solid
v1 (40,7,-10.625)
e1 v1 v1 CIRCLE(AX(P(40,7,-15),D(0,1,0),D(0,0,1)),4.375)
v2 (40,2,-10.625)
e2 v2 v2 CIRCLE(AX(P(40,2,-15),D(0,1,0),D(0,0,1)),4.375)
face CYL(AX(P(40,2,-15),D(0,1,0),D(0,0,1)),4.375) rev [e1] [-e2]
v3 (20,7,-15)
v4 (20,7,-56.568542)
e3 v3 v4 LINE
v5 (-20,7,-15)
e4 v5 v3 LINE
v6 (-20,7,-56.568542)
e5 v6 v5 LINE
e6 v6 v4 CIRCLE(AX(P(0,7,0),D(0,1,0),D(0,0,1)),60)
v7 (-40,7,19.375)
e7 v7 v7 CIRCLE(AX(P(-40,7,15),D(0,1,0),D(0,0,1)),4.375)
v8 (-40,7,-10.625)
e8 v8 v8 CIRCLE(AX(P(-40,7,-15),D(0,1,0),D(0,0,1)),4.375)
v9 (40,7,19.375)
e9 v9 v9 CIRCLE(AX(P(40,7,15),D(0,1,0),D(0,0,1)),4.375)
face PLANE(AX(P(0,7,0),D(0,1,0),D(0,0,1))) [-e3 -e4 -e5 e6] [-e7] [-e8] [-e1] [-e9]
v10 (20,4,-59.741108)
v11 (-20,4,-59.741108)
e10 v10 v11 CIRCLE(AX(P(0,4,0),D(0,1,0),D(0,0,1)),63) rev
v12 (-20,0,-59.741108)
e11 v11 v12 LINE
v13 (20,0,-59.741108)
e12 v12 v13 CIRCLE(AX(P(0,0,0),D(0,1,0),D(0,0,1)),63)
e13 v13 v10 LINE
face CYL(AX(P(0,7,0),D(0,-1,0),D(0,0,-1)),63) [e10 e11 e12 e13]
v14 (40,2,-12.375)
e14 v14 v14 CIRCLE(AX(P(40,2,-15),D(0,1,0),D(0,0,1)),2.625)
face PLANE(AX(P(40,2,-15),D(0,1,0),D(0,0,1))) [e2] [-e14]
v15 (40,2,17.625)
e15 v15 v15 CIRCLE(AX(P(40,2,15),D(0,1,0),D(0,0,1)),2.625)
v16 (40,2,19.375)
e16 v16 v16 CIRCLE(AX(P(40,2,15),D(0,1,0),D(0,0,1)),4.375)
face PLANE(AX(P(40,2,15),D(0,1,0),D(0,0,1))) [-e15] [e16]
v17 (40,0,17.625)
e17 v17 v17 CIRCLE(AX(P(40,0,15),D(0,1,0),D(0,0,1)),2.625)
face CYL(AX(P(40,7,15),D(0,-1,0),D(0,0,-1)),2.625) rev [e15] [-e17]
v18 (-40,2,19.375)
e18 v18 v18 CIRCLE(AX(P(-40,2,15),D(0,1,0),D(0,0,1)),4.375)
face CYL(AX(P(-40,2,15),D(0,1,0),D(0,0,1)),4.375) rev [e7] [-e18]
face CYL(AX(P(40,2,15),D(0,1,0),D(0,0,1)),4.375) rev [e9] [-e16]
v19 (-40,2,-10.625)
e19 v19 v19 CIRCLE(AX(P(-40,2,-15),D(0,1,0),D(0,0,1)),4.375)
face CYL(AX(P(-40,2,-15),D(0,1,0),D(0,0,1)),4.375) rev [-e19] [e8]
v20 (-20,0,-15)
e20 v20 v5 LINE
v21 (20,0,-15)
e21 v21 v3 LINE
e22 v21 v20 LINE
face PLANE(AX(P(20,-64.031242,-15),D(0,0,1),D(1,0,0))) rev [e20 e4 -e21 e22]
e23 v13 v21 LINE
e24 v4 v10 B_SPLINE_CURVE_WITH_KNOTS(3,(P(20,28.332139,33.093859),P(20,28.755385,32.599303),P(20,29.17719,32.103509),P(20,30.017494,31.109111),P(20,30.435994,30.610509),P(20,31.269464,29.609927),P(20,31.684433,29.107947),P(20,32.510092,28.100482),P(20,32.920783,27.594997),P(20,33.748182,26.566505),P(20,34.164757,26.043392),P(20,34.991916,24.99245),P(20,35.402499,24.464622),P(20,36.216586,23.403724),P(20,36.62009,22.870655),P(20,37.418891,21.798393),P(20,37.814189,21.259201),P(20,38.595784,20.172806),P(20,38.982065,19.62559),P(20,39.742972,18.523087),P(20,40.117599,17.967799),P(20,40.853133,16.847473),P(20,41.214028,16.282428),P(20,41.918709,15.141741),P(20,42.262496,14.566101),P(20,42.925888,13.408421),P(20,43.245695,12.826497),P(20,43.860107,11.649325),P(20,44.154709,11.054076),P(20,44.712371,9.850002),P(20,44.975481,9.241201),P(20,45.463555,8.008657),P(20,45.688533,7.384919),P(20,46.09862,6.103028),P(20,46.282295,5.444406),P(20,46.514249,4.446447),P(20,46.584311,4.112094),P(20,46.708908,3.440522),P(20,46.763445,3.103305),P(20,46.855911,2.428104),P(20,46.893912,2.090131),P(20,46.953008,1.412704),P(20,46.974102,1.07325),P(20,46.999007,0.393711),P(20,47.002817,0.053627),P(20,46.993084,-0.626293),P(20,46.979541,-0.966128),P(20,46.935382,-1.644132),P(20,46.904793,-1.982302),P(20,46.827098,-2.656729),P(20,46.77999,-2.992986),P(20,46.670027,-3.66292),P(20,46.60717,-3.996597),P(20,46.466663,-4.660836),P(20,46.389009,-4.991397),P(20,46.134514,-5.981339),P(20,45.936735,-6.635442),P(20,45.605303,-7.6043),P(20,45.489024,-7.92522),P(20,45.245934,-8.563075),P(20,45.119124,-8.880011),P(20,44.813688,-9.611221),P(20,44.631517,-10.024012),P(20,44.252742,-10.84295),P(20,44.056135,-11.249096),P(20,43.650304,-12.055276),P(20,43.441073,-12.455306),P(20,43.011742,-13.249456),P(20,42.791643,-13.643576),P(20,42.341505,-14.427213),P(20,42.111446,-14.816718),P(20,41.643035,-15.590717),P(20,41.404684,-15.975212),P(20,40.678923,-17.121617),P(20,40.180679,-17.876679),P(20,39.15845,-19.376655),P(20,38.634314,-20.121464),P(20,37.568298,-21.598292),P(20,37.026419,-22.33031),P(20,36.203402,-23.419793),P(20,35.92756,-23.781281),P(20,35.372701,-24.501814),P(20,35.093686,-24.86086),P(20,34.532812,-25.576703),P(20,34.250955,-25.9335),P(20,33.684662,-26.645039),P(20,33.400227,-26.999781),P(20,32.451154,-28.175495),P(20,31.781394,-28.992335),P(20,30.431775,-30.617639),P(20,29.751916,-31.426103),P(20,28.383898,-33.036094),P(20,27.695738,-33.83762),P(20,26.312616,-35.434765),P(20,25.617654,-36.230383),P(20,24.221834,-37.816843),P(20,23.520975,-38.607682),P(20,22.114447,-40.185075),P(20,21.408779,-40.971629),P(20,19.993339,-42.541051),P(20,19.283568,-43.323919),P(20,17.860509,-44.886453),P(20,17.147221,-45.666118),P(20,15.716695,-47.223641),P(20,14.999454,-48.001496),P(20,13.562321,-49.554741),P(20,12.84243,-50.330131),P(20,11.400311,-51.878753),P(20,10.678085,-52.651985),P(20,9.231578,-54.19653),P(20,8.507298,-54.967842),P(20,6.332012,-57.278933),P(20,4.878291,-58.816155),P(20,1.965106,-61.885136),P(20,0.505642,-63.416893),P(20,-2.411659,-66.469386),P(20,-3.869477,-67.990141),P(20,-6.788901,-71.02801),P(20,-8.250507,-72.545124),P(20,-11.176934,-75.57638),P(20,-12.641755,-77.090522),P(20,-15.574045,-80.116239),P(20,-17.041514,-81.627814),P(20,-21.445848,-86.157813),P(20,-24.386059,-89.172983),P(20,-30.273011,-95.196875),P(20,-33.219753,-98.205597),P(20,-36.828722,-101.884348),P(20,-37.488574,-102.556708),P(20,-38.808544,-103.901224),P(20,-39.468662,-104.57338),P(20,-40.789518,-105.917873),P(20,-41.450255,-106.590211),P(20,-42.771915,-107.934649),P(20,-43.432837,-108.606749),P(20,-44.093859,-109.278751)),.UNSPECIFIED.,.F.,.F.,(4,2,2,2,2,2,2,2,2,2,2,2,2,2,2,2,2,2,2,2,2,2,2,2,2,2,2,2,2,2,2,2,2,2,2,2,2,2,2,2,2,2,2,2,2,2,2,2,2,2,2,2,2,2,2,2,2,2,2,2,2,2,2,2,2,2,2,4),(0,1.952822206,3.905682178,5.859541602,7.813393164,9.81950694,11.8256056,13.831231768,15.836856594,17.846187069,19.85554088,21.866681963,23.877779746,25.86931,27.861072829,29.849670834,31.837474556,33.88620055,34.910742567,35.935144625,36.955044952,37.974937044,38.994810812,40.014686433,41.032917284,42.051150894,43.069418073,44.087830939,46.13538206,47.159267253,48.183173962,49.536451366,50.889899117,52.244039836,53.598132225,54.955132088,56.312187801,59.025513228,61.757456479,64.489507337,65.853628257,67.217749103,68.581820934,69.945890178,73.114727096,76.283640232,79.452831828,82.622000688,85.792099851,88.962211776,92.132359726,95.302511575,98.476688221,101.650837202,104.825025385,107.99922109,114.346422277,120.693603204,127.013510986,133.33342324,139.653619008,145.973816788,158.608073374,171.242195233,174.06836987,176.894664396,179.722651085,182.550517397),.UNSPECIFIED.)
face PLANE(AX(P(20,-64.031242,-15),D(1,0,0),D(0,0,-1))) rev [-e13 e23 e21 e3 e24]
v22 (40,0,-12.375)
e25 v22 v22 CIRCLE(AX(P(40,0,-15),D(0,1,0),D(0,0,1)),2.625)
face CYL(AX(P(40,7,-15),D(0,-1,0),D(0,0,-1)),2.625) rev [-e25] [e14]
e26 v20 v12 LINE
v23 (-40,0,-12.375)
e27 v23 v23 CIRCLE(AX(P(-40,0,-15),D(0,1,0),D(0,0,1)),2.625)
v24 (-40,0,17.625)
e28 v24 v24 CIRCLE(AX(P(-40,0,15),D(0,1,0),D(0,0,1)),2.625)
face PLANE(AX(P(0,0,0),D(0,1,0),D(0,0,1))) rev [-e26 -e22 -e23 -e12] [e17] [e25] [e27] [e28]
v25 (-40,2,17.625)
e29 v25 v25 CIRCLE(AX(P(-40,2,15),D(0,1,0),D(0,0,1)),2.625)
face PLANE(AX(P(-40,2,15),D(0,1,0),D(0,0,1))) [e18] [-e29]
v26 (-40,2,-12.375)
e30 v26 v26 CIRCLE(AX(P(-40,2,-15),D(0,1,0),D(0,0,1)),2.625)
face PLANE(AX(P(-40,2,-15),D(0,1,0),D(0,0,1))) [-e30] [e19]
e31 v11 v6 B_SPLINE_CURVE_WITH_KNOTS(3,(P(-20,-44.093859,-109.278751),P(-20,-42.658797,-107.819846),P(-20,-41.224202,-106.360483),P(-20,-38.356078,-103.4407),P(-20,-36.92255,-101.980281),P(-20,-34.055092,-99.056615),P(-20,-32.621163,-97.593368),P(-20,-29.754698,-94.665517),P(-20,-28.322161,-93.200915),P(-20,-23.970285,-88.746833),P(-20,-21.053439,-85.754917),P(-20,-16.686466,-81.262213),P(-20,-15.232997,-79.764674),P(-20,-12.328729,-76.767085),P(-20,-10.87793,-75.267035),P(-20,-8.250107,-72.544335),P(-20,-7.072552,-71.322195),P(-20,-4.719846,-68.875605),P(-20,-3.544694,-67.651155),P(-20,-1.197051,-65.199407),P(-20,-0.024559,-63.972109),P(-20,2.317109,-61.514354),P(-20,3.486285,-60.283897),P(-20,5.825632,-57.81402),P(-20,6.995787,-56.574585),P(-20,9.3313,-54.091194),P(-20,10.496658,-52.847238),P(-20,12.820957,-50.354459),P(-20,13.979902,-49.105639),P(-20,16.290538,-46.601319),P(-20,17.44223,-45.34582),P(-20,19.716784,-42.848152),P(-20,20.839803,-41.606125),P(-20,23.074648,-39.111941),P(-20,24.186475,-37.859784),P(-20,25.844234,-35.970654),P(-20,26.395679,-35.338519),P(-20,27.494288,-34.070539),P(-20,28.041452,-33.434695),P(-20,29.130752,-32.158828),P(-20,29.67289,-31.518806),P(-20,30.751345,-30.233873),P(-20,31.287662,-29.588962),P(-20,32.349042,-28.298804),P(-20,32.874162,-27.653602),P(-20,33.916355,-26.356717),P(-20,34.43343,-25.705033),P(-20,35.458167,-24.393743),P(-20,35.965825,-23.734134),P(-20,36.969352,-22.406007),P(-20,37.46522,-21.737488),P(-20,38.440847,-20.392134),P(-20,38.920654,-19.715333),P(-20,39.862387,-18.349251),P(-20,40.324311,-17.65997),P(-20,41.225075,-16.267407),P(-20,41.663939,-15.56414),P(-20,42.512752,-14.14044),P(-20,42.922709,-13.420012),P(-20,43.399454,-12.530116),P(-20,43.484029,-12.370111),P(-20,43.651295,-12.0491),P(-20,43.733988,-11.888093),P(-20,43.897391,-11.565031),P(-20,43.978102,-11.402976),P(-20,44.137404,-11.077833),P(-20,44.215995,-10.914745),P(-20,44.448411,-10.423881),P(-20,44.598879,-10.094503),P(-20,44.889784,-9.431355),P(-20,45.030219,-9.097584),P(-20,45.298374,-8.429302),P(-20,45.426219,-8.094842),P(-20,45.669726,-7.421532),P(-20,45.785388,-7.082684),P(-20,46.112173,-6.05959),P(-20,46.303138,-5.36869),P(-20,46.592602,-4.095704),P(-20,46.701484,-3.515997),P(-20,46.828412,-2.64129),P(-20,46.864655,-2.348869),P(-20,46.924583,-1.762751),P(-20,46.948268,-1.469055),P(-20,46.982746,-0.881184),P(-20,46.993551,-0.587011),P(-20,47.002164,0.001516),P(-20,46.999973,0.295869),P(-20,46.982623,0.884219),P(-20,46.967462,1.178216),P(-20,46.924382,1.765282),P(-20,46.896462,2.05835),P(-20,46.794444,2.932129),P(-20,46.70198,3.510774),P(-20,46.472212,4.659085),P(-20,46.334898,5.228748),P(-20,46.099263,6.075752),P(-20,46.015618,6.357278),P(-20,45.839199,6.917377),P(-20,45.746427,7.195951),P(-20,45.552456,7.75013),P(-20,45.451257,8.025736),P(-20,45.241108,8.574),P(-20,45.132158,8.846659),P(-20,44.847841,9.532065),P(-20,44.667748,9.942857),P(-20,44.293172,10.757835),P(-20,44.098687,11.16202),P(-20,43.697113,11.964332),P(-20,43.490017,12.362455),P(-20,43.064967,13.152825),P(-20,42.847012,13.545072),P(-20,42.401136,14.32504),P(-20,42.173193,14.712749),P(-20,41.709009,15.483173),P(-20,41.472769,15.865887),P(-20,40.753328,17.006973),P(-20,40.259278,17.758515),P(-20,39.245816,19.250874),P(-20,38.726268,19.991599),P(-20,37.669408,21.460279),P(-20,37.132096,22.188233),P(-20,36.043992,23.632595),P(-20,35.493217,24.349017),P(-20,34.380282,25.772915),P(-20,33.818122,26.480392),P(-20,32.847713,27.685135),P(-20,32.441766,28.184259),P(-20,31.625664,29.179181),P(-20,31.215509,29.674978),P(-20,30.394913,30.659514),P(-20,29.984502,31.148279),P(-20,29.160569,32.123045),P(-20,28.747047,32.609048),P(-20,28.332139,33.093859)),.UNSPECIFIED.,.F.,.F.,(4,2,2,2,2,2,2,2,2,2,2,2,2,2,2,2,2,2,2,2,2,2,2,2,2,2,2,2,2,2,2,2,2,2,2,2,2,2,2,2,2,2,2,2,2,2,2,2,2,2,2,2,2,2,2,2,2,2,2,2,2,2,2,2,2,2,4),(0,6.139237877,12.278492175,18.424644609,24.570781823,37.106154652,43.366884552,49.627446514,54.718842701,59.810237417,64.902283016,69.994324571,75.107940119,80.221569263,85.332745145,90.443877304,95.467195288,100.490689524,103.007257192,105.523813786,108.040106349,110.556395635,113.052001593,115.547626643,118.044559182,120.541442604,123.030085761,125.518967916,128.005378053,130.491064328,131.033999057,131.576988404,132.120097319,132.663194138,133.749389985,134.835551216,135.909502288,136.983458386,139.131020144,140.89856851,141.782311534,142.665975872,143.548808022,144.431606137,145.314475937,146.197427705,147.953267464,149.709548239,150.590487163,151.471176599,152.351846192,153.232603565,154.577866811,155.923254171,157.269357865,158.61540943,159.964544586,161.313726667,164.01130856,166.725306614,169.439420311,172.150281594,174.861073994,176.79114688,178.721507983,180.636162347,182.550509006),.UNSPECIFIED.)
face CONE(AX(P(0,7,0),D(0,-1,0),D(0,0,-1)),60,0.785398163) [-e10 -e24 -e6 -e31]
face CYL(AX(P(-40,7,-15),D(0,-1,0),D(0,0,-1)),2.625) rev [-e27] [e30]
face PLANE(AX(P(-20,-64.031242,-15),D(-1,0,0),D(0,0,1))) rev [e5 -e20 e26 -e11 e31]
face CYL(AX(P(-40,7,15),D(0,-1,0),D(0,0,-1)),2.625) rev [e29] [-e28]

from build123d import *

# Parameters (mm, degrees)
SKETCH1_R           = 63
SKETCH1_R_2         = 2.625
BOSS_EXTRUDE1_DEPTH = 7
SKETCH2_R           = 4.375
CUT_EXTRUDE1_DEPTH  = 5
CUT_EXTRUDE2_REACH  = 91.37
SKETCH3_W           = 40
SKETCH3_H           = 50


with BuildPart() as part:
    # Sketch1 → Boss-Extrude1 (new body)
    with BuildSketch(Plane(origin=(0, 0, 0), x_dir=(1, 0, 0), z_dir=(0, 1, 0))):
        with Locations(Location((0, 0, 0), (0, 0, 270))):
            Circle(SKETCH1_R)
        with Locations(Location((-40, 15, 0), (0, 0, 270))):
            Circle(SKETCH1_R_2, mode=Mode.SUBTRACT)
        with Locations(Location((-40, -15, 0), (0, 0, 270))):
            Circle(SKETCH1_R_2, mode=Mode.SUBTRACT)
        with Locations(Location((40, 15, 0), (0, 0, 270))):
            Circle(SKETCH1_R_2, mode=Mode.SUBTRACT)
        with Locations(Location((40, -15, 0), (0, 0, 270))):
            Circle(SKETCH1_R_2, mode=Mode.SUBTRACT)
    extrude(amount=BOSS_EXTRUDE1_DEPTH)

    # Sketch2 → Cut-Extrude1 (cut)
    with BuildSketch(Plane(origin=(0, 7, 0), x_dir=(1, 0, 0), z_dir=(0, 1, 0))):
        with Locations(Location((-40, 15, 0), (0, 0, 270))):
            Circle(SKETCH2_R)
        with Locations(Location((-40, -15, 0), (0, 0, 270))):
            Circle(SKETCH2_R)
        with Locations(Location((40, 15, 0), (0, 0, 270))):
            Circle(SKETCH2_R)
        with Locations(Location((40, -15, 0), (0, 0, 270))):
            Circle(SKETCH2_R)
    extrude(amount=-CUT_EXTRUDE1_DEPTH, mode=Mode.SUBTRACT)

    # Chamfer1: read off the stored shape, not the designer's step
    # Chamfer1 outline → Chamfer1 (revolve, cut)
    with BuildSketch(Plane.XY):
        Polygon((63, 7), (60, 7), (63, 4), align=None)
    revolve(axis=Axis((0, 0, 0), (0, 1, 0)), mode=Mode.SUBTRACT)

    # Cut-Extrude2: up to this face of the body (flat: up to its plane)
    cut_extrude2_end = Plane(part.part.faces().sort_by_distance((0, 0, 0))[0])
    # Sketch3 → Cut-Extrude2 (cut, up to the picked face)
    with BuildSketch(Plane(origin=(0, 7, 0), x_dir=(1, 0, 0), z_dir=(0, 1, 0)), mode=Mode.PRIVATE) as cut_extrude2_sk1:
        with Locations((0, 40)):
            Rectangle(SKETCH3_W, SKETCH3_H)
    cut_extrude2_tool1 = split(extrude(cut_extrude2_sk1.sketch, amount=-CUT_EXTRUDE2_REACH, mode=Mode.PRIVATE), bisect_by=cut_extrude2_end, keep=Keep.BOTH, mode=Mode.PRIVATE)
    add(cut_extrude2_tool1.solids().sort_by(Axis((0, 7, -40), (0, -1, 0)))[0], mode=Mode.SUBTRACT)


solid = part.part
